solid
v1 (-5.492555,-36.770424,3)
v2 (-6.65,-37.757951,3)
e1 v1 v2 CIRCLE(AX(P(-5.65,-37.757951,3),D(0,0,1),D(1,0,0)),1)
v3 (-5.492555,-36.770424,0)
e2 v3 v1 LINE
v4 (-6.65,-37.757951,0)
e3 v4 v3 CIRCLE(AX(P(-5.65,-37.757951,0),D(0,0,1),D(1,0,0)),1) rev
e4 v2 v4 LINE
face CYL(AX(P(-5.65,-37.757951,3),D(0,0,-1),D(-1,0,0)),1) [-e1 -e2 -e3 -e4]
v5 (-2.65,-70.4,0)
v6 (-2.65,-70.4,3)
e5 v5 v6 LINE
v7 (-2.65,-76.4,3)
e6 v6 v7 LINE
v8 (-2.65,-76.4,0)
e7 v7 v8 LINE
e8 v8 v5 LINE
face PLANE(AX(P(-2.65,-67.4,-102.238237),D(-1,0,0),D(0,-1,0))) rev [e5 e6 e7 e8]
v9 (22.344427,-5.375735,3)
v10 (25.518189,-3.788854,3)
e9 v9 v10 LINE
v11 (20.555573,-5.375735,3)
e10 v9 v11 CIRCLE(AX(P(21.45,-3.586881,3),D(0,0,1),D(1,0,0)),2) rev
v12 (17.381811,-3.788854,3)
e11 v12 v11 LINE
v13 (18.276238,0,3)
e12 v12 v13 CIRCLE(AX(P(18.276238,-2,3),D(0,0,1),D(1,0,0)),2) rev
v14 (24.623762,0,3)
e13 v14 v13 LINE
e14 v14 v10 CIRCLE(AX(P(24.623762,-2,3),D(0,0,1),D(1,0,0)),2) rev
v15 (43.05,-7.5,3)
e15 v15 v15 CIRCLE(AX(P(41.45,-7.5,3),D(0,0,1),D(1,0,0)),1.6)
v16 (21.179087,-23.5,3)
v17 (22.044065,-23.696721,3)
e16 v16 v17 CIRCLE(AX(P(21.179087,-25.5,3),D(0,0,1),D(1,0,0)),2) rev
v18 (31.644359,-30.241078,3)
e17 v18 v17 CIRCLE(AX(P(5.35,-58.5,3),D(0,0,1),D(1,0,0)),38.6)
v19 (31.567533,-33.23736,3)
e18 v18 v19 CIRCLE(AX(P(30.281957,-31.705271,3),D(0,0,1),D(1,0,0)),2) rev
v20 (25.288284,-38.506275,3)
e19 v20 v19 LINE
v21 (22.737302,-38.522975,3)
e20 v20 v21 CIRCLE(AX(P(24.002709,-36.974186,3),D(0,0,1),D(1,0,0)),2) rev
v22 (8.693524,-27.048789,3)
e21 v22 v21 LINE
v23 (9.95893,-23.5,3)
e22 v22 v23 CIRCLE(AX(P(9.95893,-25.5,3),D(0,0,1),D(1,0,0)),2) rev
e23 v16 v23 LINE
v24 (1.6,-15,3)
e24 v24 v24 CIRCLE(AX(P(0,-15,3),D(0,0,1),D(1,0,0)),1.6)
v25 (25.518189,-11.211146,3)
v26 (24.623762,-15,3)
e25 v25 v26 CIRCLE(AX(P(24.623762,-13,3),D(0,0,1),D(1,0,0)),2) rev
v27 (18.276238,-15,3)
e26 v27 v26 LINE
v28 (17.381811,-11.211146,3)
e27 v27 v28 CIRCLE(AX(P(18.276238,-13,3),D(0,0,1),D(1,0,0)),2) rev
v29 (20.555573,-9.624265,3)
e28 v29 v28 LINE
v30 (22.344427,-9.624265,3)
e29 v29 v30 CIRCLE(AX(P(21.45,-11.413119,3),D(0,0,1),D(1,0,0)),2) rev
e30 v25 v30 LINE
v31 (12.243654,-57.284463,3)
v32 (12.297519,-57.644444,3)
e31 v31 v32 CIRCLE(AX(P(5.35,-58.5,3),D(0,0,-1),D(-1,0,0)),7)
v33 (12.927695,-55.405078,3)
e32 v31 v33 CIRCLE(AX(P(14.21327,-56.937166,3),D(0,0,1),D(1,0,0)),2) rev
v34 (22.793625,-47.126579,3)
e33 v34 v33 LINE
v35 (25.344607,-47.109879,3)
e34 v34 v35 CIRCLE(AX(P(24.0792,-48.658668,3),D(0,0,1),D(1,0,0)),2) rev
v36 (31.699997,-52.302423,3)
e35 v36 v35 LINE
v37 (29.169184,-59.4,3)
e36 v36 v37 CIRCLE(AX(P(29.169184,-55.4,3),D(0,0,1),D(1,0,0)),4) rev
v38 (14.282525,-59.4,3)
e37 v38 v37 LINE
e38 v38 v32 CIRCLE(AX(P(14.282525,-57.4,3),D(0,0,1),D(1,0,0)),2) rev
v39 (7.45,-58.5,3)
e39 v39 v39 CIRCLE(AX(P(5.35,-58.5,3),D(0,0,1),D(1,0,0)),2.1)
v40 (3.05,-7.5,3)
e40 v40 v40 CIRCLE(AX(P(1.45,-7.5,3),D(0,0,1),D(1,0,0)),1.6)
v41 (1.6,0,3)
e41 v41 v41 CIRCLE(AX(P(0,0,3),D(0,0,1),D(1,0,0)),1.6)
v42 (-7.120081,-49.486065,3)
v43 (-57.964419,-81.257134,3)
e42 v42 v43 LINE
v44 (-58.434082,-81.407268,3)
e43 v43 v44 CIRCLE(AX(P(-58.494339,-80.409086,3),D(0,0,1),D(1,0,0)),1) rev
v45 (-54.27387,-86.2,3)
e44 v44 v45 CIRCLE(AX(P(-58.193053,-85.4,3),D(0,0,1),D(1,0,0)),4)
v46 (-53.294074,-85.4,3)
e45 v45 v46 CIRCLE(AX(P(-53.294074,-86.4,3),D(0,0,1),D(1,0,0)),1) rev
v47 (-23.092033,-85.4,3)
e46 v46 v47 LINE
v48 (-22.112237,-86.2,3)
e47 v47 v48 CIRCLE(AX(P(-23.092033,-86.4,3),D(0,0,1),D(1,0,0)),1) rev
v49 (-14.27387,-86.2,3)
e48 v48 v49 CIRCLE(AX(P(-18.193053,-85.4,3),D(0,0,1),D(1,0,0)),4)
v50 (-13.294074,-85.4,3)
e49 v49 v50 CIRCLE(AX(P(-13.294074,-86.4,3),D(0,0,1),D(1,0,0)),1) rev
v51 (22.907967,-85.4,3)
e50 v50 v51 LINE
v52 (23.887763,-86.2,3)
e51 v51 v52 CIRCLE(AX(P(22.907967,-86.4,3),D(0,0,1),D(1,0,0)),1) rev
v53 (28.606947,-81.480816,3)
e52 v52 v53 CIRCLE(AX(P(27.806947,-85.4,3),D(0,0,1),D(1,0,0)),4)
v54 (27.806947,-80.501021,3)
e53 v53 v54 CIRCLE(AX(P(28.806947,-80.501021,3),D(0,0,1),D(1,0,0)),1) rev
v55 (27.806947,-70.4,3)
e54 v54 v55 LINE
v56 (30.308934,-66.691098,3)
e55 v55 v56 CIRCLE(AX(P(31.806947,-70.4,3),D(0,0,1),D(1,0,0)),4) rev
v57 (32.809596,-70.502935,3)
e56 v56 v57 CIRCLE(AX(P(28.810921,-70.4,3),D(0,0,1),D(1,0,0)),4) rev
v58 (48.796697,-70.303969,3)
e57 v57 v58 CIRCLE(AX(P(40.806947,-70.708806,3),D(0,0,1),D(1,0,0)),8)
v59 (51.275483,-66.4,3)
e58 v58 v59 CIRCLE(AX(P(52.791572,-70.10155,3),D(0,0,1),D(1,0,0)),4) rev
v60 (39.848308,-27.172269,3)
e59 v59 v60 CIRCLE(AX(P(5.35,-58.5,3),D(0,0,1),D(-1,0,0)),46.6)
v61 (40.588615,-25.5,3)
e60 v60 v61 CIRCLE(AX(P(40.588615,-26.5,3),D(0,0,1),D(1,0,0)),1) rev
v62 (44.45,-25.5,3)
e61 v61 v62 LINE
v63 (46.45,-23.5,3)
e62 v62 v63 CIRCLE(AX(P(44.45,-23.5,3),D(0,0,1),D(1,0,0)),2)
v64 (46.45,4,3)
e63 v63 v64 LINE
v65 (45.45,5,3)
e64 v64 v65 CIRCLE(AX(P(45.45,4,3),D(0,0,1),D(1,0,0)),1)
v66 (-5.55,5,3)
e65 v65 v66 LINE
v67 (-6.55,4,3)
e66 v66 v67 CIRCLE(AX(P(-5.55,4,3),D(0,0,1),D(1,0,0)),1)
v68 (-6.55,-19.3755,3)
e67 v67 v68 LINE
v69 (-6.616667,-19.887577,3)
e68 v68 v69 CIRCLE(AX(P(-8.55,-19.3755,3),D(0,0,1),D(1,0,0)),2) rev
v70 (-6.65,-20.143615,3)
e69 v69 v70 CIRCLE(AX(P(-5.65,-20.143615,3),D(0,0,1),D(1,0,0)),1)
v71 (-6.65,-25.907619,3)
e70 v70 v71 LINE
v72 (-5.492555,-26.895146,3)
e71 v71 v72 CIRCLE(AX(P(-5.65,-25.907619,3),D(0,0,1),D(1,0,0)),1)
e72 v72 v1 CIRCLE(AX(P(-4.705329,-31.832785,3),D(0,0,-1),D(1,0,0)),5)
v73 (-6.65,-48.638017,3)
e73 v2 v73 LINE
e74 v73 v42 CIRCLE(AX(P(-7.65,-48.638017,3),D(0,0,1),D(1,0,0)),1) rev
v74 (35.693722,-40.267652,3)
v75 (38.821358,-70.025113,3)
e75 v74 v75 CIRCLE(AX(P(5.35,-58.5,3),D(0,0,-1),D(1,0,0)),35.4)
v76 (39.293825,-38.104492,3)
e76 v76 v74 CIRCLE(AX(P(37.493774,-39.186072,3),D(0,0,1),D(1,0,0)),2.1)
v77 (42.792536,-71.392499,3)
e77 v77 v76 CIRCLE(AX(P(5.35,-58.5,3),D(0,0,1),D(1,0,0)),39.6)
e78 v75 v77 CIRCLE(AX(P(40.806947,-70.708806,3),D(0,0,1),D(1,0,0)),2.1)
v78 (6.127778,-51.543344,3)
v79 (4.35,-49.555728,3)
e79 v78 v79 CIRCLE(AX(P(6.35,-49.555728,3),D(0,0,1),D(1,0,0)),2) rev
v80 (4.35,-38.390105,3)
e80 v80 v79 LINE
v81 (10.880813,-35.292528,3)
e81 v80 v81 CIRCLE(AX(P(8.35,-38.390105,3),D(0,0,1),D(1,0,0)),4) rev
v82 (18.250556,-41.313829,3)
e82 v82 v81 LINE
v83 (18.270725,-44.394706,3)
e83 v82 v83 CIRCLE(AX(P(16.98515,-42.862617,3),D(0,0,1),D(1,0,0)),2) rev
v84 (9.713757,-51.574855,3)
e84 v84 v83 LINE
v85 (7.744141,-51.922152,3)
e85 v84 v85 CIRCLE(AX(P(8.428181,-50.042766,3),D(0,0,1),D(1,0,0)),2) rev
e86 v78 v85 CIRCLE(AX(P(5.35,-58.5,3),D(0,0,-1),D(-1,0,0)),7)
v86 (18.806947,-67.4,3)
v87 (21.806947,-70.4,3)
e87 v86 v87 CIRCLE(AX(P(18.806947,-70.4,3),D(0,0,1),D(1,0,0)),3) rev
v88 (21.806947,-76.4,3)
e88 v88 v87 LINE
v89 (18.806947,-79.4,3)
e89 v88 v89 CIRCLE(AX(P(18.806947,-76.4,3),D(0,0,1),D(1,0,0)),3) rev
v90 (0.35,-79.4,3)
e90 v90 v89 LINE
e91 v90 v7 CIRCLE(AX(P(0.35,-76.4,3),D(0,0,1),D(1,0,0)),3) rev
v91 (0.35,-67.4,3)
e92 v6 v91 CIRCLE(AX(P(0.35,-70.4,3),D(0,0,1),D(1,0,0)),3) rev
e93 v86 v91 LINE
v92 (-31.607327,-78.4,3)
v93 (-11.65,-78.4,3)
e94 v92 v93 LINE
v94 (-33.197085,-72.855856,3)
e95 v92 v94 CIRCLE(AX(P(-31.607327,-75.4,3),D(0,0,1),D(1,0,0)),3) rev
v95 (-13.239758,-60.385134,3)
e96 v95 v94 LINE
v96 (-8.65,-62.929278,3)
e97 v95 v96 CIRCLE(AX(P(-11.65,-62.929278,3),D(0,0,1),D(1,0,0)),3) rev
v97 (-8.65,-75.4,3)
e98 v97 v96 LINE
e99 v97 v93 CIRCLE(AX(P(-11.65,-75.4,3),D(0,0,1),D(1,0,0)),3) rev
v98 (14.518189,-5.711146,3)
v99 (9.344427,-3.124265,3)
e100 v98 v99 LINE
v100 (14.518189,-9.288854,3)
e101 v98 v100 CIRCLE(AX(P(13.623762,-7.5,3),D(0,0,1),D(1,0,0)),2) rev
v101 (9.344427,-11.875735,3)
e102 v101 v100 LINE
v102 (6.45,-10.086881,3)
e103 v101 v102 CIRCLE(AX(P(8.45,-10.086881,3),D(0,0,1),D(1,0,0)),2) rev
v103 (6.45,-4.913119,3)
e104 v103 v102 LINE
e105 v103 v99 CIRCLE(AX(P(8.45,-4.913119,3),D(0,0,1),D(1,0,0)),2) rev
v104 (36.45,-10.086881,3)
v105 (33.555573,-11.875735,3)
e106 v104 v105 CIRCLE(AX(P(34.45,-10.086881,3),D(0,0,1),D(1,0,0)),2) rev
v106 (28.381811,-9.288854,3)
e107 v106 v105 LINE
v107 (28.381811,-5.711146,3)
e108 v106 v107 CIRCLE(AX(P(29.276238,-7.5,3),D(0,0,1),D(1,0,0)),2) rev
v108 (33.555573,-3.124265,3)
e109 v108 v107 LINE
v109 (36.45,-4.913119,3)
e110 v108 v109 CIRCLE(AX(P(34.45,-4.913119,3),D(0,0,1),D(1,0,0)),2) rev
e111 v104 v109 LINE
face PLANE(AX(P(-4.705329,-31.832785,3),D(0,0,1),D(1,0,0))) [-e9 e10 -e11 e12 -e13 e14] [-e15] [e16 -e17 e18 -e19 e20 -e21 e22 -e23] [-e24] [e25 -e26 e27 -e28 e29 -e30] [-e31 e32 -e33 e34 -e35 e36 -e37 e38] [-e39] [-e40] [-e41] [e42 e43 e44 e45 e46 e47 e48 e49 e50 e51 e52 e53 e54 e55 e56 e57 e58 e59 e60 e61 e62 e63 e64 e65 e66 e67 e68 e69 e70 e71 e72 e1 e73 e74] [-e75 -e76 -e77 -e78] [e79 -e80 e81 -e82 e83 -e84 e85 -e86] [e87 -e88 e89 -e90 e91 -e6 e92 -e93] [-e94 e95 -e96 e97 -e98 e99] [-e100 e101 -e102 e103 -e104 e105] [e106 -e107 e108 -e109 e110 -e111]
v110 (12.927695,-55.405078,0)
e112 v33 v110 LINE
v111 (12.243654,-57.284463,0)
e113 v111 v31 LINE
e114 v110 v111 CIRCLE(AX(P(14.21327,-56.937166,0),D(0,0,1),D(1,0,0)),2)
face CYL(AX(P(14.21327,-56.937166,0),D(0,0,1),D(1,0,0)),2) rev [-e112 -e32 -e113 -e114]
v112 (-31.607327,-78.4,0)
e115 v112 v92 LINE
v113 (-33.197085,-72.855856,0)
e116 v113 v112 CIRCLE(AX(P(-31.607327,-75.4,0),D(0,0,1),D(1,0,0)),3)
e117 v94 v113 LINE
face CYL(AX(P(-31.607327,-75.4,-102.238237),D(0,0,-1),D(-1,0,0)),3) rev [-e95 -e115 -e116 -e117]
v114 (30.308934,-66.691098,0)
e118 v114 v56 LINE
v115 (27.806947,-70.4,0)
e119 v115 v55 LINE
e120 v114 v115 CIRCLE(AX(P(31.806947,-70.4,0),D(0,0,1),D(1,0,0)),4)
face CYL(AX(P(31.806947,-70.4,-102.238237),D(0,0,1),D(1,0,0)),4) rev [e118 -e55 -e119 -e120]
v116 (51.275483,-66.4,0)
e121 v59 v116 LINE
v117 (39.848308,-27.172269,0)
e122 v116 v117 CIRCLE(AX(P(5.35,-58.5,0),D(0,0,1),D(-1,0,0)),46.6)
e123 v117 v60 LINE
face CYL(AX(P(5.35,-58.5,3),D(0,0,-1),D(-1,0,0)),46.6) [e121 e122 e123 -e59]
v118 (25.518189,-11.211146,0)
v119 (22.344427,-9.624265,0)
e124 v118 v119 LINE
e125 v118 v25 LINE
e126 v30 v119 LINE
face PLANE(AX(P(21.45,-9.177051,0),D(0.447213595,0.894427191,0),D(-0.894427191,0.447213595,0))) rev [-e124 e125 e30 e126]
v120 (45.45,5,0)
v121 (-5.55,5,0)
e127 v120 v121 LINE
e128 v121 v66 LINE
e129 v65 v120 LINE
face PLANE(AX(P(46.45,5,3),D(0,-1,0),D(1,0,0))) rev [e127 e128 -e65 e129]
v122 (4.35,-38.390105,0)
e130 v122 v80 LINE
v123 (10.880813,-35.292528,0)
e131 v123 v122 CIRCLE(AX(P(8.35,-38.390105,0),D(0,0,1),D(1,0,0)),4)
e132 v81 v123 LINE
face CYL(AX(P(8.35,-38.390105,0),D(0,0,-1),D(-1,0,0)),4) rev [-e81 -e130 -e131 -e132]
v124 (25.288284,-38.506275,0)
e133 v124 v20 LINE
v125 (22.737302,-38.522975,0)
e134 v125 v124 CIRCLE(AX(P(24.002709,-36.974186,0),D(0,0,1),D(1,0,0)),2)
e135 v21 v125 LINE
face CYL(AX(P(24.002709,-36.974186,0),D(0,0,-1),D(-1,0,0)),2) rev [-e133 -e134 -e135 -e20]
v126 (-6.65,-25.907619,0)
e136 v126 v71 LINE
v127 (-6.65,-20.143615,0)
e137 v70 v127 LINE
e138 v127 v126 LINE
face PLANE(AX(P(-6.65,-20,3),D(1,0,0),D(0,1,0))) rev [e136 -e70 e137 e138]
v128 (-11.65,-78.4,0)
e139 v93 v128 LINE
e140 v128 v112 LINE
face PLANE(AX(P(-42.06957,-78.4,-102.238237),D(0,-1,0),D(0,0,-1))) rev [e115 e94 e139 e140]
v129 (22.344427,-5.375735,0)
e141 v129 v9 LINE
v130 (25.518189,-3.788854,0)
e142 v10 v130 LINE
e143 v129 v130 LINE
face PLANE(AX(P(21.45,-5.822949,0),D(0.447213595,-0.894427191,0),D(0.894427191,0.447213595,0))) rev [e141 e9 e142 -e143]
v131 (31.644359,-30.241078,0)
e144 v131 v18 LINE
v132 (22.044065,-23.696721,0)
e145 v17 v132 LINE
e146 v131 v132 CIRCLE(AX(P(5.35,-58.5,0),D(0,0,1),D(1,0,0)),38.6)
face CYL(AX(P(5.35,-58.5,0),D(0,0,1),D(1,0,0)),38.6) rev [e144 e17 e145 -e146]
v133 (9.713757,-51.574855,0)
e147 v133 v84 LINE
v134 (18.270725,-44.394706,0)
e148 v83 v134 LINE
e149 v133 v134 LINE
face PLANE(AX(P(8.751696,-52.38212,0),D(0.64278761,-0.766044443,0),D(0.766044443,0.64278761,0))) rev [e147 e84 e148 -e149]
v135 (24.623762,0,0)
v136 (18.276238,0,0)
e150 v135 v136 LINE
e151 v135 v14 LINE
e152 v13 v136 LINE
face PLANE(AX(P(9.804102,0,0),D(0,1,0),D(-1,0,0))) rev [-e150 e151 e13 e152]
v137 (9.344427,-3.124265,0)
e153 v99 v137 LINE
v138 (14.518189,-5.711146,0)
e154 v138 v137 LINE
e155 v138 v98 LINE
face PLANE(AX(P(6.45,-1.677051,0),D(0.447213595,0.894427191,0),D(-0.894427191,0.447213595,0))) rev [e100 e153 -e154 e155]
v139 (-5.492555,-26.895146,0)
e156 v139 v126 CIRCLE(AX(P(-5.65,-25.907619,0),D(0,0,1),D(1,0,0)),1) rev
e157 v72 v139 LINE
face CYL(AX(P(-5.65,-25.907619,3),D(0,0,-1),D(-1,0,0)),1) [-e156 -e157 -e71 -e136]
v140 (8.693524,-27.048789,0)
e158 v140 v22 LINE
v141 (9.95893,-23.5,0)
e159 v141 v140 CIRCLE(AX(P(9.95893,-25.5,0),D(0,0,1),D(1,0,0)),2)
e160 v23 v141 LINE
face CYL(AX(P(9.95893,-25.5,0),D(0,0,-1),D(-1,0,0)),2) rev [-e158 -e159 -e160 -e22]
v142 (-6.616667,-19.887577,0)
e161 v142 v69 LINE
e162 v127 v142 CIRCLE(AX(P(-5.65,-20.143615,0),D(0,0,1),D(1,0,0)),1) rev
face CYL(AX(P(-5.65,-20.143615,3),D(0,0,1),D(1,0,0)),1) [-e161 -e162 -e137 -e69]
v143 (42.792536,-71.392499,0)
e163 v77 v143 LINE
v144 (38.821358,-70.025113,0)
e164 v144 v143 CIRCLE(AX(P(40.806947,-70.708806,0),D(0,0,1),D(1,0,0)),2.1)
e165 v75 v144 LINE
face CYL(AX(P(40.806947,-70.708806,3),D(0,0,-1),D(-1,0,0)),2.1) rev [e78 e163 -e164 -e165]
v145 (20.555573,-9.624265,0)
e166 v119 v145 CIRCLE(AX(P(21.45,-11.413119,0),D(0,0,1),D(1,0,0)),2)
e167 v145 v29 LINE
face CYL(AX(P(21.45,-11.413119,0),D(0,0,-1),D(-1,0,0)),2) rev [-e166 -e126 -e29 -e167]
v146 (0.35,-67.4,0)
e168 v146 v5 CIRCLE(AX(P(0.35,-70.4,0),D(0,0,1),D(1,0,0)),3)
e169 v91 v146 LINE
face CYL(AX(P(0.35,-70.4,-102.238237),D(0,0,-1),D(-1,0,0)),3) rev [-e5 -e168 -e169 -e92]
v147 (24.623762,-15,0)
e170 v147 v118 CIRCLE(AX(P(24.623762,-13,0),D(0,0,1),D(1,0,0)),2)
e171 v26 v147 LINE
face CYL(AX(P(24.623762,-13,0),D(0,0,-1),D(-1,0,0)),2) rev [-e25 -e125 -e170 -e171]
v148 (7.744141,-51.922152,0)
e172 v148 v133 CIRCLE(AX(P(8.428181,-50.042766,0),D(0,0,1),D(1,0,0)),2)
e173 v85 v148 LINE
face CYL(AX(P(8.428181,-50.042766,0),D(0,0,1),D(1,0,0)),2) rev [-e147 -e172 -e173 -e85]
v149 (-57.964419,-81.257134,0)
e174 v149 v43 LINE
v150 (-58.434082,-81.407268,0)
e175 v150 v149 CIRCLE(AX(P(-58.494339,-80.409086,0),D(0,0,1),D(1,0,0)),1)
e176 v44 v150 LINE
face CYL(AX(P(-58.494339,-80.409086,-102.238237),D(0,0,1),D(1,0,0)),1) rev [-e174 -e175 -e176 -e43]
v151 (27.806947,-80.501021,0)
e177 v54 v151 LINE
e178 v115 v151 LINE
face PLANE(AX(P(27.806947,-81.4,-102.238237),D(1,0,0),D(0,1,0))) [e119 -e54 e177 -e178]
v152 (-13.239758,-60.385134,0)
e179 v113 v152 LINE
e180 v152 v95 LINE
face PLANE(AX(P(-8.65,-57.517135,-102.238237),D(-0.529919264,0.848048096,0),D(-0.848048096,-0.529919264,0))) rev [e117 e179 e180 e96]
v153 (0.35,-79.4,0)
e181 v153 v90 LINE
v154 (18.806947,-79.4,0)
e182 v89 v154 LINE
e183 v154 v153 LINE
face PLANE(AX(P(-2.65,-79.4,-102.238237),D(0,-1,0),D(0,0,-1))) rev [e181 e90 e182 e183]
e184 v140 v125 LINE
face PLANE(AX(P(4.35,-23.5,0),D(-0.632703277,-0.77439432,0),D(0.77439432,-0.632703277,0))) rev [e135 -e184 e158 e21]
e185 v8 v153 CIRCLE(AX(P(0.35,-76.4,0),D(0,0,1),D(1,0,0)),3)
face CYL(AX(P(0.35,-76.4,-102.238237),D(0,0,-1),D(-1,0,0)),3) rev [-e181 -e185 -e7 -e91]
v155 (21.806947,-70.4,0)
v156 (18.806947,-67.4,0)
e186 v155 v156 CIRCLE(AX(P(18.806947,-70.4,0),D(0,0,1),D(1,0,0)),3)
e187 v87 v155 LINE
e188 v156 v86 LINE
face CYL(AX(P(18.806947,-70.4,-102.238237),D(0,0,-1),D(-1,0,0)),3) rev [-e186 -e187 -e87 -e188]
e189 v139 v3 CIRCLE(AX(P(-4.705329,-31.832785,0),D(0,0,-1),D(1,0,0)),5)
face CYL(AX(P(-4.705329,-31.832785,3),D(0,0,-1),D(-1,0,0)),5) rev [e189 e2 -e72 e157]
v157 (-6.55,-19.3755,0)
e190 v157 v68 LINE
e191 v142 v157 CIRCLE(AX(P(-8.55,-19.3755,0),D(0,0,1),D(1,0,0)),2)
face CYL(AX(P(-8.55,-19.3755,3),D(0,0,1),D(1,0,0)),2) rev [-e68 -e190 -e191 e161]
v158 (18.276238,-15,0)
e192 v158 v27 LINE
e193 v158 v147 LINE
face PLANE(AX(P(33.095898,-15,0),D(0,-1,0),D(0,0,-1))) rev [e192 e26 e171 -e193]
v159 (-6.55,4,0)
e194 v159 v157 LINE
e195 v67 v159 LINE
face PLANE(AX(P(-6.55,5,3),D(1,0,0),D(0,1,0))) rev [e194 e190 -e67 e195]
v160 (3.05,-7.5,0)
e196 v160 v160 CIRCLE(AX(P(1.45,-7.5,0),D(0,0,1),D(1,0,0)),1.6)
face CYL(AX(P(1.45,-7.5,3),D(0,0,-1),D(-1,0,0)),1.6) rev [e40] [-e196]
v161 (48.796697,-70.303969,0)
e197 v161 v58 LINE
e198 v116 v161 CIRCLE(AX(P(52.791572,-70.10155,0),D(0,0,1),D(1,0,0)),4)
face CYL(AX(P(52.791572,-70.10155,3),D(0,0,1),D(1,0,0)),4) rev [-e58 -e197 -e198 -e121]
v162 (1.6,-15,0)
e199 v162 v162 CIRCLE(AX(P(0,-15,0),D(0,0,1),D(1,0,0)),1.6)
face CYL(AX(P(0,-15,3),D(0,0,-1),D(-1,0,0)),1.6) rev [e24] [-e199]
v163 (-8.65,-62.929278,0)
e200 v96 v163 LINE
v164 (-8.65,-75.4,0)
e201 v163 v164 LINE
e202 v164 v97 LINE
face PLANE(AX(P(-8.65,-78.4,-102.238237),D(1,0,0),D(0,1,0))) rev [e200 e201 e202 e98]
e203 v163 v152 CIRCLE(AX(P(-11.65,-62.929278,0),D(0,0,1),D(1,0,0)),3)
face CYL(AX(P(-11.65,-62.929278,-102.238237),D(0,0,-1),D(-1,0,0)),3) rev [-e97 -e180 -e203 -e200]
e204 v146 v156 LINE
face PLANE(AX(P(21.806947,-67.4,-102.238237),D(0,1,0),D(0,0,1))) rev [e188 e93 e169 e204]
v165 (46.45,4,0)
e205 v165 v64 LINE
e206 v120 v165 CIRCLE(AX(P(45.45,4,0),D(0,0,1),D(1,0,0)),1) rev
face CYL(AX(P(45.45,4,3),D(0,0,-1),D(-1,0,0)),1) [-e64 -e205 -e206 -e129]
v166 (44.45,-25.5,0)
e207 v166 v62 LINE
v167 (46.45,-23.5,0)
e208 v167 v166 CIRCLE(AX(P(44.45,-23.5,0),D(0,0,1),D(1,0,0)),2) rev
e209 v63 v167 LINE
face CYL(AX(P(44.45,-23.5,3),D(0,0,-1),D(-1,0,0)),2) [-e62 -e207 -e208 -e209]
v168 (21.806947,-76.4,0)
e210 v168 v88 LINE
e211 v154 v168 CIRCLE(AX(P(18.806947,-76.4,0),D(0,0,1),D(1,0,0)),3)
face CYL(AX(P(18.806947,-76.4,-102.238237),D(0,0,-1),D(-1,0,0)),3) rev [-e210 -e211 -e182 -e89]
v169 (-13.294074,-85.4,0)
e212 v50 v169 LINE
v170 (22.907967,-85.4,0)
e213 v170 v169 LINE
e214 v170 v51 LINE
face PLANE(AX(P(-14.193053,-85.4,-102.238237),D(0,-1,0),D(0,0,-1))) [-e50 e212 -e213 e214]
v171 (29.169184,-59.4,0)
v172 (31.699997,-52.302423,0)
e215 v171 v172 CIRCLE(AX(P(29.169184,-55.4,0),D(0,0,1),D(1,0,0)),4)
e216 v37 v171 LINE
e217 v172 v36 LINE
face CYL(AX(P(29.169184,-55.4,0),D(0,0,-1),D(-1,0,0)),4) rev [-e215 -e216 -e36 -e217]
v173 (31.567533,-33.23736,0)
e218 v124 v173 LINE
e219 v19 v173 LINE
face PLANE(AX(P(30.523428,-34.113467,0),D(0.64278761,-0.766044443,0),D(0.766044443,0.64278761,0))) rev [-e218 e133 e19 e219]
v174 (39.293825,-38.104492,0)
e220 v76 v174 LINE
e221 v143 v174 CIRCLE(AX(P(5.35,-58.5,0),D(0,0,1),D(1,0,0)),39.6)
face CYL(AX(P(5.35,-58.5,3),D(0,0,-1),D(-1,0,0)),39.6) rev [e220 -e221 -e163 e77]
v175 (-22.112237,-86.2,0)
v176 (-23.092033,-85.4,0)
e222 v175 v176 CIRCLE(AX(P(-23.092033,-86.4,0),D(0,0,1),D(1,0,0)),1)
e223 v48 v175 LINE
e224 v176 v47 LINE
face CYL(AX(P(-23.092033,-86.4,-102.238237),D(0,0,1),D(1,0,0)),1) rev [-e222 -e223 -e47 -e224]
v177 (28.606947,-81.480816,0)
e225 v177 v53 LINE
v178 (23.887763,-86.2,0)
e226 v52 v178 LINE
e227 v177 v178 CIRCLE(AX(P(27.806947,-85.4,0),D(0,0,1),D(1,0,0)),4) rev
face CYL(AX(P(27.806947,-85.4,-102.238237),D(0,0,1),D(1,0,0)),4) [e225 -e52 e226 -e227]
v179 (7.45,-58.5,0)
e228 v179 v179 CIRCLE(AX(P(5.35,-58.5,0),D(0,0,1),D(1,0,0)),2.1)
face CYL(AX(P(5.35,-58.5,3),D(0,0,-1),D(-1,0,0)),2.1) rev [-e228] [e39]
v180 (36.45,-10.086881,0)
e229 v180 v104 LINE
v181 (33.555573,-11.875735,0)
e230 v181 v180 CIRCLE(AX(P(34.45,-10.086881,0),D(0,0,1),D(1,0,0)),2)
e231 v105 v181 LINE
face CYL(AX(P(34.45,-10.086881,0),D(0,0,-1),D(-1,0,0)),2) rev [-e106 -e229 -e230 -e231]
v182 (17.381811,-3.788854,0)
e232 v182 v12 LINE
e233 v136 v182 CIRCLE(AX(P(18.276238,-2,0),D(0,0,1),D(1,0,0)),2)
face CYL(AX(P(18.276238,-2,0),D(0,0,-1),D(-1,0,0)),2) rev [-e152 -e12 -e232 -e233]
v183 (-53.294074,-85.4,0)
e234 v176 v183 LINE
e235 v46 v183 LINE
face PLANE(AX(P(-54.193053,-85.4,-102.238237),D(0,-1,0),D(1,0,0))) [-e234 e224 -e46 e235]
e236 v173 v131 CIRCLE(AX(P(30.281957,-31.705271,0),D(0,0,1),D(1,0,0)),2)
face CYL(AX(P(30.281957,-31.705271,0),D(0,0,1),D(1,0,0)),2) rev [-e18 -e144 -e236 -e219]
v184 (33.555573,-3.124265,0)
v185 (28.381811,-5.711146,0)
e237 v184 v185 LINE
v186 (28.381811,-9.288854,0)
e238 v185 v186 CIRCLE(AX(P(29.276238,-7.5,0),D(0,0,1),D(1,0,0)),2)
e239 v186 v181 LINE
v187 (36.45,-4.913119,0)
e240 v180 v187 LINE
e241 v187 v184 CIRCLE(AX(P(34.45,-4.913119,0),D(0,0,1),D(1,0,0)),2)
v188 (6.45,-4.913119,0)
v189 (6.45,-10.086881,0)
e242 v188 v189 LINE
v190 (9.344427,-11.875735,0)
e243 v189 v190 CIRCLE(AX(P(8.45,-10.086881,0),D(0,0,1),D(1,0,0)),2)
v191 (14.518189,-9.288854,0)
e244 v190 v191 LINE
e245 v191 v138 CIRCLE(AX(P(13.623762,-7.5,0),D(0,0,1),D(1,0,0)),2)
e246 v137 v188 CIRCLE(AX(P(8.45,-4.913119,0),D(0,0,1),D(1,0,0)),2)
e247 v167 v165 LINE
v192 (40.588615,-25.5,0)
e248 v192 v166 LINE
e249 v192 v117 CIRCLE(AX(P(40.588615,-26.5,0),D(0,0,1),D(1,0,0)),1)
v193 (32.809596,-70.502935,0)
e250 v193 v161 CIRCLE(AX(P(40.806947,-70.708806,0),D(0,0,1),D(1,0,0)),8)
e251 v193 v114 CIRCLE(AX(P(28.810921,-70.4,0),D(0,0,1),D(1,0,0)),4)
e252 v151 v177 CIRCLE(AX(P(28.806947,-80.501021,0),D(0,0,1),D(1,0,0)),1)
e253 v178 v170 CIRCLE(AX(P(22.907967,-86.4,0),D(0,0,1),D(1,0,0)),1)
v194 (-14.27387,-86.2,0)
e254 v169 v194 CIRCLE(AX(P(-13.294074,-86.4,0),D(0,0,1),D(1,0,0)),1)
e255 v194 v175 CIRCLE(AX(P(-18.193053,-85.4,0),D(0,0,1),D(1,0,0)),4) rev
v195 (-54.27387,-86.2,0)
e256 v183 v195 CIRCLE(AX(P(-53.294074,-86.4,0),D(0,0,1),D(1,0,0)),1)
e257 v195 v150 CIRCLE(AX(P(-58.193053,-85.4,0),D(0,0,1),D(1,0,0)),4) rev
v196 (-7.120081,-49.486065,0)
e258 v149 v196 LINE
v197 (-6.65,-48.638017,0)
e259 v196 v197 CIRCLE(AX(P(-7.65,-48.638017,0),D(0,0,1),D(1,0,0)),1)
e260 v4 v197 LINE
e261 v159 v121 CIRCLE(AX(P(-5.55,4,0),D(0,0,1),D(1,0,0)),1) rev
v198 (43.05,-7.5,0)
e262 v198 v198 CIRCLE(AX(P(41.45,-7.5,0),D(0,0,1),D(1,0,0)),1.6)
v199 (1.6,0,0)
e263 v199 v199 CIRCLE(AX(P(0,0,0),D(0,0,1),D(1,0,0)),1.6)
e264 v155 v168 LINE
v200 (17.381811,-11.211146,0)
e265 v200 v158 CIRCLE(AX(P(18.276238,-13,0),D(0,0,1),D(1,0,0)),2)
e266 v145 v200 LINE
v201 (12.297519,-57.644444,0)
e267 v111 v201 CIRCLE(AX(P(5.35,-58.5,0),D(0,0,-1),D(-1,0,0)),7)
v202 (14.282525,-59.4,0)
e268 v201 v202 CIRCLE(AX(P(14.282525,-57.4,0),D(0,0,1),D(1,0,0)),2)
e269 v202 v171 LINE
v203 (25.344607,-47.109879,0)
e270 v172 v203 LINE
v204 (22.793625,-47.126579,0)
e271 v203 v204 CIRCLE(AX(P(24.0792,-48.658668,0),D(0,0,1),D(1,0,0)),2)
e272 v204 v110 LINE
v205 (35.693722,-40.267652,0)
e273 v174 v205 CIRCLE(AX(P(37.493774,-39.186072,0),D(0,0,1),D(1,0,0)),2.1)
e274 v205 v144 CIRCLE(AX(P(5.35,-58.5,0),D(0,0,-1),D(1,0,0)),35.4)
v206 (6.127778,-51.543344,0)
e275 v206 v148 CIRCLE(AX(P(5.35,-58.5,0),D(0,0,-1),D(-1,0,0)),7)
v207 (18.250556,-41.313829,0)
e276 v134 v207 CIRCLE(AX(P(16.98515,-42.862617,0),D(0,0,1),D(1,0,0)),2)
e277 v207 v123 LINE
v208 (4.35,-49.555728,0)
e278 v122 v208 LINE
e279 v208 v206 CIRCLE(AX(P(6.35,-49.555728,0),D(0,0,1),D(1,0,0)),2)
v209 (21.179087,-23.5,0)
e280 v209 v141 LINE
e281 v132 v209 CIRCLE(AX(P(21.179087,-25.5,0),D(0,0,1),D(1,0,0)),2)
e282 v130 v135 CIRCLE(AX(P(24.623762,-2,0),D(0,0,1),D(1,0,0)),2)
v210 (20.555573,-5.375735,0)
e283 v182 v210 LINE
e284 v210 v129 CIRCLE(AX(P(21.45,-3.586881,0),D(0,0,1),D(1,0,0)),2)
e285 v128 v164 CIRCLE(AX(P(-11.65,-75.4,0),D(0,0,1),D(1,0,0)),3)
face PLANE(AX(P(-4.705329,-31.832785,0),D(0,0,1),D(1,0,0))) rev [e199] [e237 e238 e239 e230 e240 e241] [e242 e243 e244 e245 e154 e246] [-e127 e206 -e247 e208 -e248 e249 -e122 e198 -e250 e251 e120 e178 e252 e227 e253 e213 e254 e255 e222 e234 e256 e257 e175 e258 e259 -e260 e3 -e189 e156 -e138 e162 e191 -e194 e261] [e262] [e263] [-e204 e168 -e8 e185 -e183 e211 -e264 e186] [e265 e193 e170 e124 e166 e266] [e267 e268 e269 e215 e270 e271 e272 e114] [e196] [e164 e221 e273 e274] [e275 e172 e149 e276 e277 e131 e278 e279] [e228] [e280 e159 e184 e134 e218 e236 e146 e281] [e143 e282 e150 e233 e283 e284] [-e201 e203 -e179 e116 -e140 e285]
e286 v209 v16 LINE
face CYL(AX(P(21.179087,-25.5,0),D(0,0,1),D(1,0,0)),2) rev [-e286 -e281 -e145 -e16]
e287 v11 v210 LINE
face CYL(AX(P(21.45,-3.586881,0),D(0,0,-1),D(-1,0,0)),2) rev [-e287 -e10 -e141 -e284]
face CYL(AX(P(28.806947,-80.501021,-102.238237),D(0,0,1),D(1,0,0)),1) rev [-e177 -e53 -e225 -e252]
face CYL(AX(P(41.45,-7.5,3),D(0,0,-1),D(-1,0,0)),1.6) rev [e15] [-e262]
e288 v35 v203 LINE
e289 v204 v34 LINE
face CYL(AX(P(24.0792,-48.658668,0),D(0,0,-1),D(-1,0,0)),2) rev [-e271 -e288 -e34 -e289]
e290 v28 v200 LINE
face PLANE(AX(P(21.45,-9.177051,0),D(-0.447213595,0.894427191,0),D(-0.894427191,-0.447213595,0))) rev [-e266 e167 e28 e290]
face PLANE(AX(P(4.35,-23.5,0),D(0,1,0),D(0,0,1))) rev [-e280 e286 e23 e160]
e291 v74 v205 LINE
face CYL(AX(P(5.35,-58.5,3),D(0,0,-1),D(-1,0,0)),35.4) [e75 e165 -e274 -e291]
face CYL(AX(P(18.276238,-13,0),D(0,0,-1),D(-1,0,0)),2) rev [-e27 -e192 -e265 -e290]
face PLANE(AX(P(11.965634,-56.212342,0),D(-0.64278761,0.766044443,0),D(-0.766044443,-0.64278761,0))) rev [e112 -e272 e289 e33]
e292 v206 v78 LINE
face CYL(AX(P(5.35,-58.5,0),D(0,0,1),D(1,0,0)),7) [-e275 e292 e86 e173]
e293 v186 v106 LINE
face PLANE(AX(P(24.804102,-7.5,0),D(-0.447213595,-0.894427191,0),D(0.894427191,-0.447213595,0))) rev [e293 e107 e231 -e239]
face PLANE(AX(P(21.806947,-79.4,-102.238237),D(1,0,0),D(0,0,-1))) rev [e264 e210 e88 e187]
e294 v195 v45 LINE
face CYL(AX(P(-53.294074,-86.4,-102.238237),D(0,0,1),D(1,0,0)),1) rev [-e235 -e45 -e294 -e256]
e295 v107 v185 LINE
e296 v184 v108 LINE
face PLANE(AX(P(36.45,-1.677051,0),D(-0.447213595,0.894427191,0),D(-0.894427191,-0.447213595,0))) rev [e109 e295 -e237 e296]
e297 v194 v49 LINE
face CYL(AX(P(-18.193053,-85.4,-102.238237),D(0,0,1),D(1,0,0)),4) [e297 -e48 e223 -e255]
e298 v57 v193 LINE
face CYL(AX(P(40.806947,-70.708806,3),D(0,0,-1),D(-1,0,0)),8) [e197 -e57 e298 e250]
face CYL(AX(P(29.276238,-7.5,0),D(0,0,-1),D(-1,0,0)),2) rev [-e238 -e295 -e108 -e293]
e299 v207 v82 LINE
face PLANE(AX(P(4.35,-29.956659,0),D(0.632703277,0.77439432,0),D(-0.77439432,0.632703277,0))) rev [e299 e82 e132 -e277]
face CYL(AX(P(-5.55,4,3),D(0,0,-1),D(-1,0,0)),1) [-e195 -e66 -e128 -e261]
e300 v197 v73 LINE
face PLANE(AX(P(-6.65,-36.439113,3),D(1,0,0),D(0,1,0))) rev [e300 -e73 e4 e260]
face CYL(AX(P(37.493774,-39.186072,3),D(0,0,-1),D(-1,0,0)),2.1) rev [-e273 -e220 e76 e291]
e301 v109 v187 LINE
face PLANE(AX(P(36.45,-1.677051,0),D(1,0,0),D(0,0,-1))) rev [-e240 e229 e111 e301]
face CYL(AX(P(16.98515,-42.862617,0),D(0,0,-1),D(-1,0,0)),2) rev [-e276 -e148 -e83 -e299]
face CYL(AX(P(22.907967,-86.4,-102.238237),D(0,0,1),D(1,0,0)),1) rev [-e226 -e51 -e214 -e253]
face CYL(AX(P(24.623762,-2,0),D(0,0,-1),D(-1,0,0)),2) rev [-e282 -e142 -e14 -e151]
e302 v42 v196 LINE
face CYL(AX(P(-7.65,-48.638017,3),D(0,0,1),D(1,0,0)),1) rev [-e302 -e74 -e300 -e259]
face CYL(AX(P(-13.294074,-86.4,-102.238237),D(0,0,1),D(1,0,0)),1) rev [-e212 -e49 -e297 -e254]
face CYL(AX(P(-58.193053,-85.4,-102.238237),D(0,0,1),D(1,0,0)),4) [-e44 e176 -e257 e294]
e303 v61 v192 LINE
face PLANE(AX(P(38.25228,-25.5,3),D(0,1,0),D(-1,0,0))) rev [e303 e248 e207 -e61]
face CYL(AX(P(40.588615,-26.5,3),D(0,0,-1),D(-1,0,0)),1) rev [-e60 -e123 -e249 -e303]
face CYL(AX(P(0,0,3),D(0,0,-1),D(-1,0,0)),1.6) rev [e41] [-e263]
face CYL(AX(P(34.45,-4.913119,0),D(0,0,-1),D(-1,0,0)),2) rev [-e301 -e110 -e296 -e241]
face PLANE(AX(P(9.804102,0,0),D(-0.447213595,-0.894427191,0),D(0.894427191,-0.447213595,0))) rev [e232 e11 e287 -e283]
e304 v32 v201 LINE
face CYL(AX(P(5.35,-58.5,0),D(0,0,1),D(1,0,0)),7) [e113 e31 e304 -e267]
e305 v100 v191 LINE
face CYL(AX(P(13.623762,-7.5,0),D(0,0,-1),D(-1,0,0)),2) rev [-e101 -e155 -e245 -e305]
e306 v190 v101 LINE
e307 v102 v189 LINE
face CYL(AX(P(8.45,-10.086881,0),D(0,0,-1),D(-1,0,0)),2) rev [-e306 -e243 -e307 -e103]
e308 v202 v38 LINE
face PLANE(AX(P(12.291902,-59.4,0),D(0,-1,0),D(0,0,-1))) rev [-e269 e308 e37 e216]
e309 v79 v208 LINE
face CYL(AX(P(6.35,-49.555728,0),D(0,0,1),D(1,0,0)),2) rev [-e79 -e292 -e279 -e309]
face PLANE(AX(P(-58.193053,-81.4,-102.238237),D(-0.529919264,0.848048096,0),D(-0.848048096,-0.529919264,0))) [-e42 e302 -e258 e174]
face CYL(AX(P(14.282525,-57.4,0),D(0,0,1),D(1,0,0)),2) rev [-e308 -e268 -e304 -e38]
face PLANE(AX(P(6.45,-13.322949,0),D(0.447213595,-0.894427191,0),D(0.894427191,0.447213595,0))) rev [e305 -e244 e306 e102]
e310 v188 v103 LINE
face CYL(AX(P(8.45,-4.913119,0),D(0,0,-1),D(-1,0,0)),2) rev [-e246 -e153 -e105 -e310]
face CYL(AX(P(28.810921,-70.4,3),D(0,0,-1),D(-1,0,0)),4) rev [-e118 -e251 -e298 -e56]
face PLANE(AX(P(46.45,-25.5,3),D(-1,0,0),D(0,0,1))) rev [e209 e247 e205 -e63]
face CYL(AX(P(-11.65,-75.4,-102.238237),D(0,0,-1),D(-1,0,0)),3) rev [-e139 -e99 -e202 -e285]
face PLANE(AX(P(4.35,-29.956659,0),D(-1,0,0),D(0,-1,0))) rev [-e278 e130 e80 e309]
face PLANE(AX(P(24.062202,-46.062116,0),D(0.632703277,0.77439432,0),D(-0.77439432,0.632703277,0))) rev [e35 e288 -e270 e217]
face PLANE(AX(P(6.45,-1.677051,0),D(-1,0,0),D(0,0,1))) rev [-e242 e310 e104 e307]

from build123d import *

# Parameters (mm, degrees)
SKETCH_1_R          = 1.6
SKETCH_1_R_2        = 2.1
EXTRUDE_1_DEPTH     = 3
CUT_EXTRUDE_1_DEPTH = 3
FILLET_1_R          = 2
FILLET_3_R          = 1
FILLET_4_R          = 4
SKETCH_3_W          = 24.456946585
SKETCH_3_H          = 12
EXTRUDE_2_DEPTH     = 3
FILLET_7_R          = 3
FILLET_8_R          = 1
FILLET_9_R          = 4


with BuildPart() as part:
    # 草图1 → 凸台-拉伸1 (new body)
    with BuildSketch(Plane.XY):
        with BuildLine():
            Line((-6.55, 5), (-6.55, -20))
            Line((-6.55, -20), (-6.65, -20))
            Line((-6.65, -20), (-6.65, -27.226457264))
            ThreePointArc((-6.65, -27.226457264), (0.294670949, -31.832784966), (-6.65, -36.439112668))
            Line((-6.65, -36.439112668), (-6.65, -66.4))
            Line((-6.65, -66.4), (27.321635963, -66.4))
            Line((27.321635963, -66.4), (34.066457534, -66.4))
            ThreePointArc((34.066457534, -66.4), (40.806946585, -78.708805792), (47.547435636, -66.4))
            Line((47.547435636, -66.4), (51.275483122, -66.4))
            ThreePointArc((51.275483122, -66.4), (49.753339314, -44.361278071), (38.252279556, -25.5))
            Line((38.252279556, -25.5), (46.45, -25.5))
            Line((46.45, -25.5), (46.45, 5))
            Line((46.45, 5), (-6.55, 5))
        make_face()
        Circle(SKETCH_1_R, mode=Mode.SUBTRACT)
        with Locations((0, -15)):
            Circle(SKETCH_1_R, mode=Mode.SUBTRACT)
        with Locations((41.45, -7.5)):
            Circle(SKETCH_1_R, mode=Mode.SUBTRACT)
        with Locations((1.45, -7.5)):
            Circle(SKETCH_1_R, mode=Mode.SUBTRACT)
        with Locations((5.35, -58.5)):
            Circle(SKETCH_1_R_2, mode=Mode.SUBTRACT)
        with BuildLine():
            ThreePointArc((39.293825108, -38.104492234), (36.412193819, -37.386020859), (35.693722445, -40.267652148))
            ThreePointArc((35.693722445, -40.267652148), (40.556075096, -54.7996924), (38.821357576, -70.025112668))
            ThreePointArc((38.821357576, -70.025112668), (40.123253461, -72.694394801), (42.792535594, -71.392498917))
            ThreePointArc((42.792535594, -71.392498917), (44.733067057, -54.360672855), (39.293825108, -38.104492234))
        make_face(mode=Mode.SUBTRACT)
    extrude(amount=EXTRUDE_1_DEPTH)

    # 草图2 → 切除-拉伸1 (cut)
    with BuildSketch(Plane.XY.offset(3)):
        with BuildLine():
            Line((8.751696447, -52.382119543), (20.12106304, -42.842088228))
            Line((20.12106304, -42.842088228), (4.35, -29.956658925))
            Line((4.35, -29.956658925), (4.35, -51.57179677))
            ThreePointArc((4.35, -51.57179677), (6.617356384, -51.615683927), (8.751696447, -52.382119543))
        make_face()
        with BuildLine():
            Line((11.965634495, -56.212341759), (24.062202011, -46.062116418))
            Line((24.062202011, -46.062116418), (40.387044425, -59.4))
            Line((40.387044425, -59.4), (12.291901757, -59.4))
            ThreePointArc((12.291901757, -59.4), (12.313618928, -57.787250794), (11.965634495, -56.212341759))
        make_face()
        with BuildLine():
            Line((4.35, -23.5), (24.01970683, -39.570737661))
            Line((24.01970683, -39.570737661), (30.523428477, -34.113467226))
            Line((30.523428477, -34.113467226), (33.250263459, -31.825380998))
            ThreePointArc((33.250263459, -31.825380998), (27.82773831, -27.119890369), (21.62759196, -23.5))
            Line((21.62759196, -23.5), (4.35, -23.5))
        make_face()
        Polygon((6.45, -13.322949017), (18.095898034, -7.5), (6.45, -1.677050983), align=None)
        Polygon((36.45, -1.677050983), (24.804101966, -7.5), (36.45, -13.322949017), align=None)
        Polygon((9.804101966, 0), (21.45, -5.822949017), (33.095898034, 0), align=None)
        Polygon((33.095898034, -15), (9.804101966, -15), (21.45, -9.177050983), align=None)
    extrude(amount=-CUT_EXTRUDE_1_DEPTH, mode=Mode.SUBTRACT)

    # 圆角1
    # the kernel refuses this fillet: 2 mm, written as the material it adds along each edge
    with BuildSketch(Plane(origin=(33.095898034, -15, 3), x_dir=(-0.8944271909999163, 0.4472135954999571, 0), z_dir=(0, 0, -1)), Plane(origin=(9.804101966, 0, 3), x_dir=(0.8944271909999155, -0.44721359549995865, 0), z_dir=(0, 0, -1))) as fillet_1_piece_1:
        with BuildLine():
            CenterArc((FILLET_1_R * 4.2360679775, -FILLET_1_R), FILLET_1_R, 90, 153.434948823)
            Line((FILLET_1_R * 3.788854382, -FILLET_1_R * 1.894427191), (0, 0))
            Line((0, 0), (FILLET_1_R * 4.2360679775, 0))
        make_face()
    extrude(amount=3)
    with BuildSketch(Plane(origin=(21.45, -9.177050983, 3), x_dir=(0.8944271909999166, -0.44721359549995654, 0), z_dir=(0, 0, -1)), Plane(origin=(21.45, -5.822949017, 3), x_dir=(-0.8944271909999162, 0.4472135954999572, 0), z_dir=(0, 0, -1))) as fillet_1_piece_2:
        with BuildLine():
            CenterArc((FILLET_1_R * 0.5, FILLET_1_R), FILLET_1_R, 216.869897646, 53.130102354)
            Line((-FILLET_1_R * 0.3, FILLET_1_R * 0.4), (0, 0))
            Line((0, 0), (FILLET_1_R * 0.5, 0))
        make_face()
    extrude(amount=3)
    with BuildSketch(Plane(origin=(36.45, -1.677050983, 3), x_dir=(-0.8944271909999159, -0.4472135954999579, 0), z_dir=(0, 0, -1)), Plane(origin=(6.45, -13.322949017, 3), x_dir=(0.8944271909999159, 0.4472135954999579, 0), z_dir=(0, 0, -1))) as fillet_1_piece_3:
        with BuildLine():
            CenterArc((FILLET_1_R * 1.61803398875, -FILLET_1_R), FILLET_1_R, 90, 116.565051177)
            Line((FILLET_1_R * 0.72360679775, -FILLET_1_R * 1.4472135955), (0, 0))
            Line((0, 0), (FILLET_1_R * 1.61803398875, 0))
        make_face()
    extrude(amount=3)
    with BuildSketch(Plane(origin=(24.804101966, -7.5, 3), x_dir=(0.8944271909999156, 0.44721359549995826, 0), z_dir=(0, 0, -1)), Plane(origin=(18.095898034, -7.5, 3), x_dir=(-0.8944271909999161, -0.4472135954999576, 0), z_dir=(0, 0, -1))) as fillet_1_piece_4:
        with BuildLine():
            CenterArc((FILLET_1_R * 2, FILLET_1_R), FILLET_1_R, 143.130102354, 126.869897646)
            Line((FILLET_1_R * 1.2, FILLET_1_R * 1.6), (0, 0))
            Line((0, 0), (FILLET_1_R * 2, 0))
        make_face()
    extrude(amount=3)
    with BuildSketch(Plane(origin=(36.45, -13.322949017, 3), x_dir=(-0.8944271909999161, 0.4472135954999575, 0), z_dir=(0, 0, -1)), Plane(origin=(6.45, -1.677050983, 3), x_dir=(0.8944271909999161, -0.4472135954999575, 0), z_dir=(0, 0, -1))) as fillet_1_piece_5:
        with BuildLine():
            CenterArc((FILLET_1_R * 1.61803398875, FILLET_1_R), FILLET_1_R, 153.434948823, 116.565051177)
            Line((FILLET_1_R * 0.72360679775, FILLET_1_R * 1.4472135955), (0, 0))
            Line((0, 0), (FILLET_1_R * 1.61803398875, 0))
        make_face()
    extrude(amount=3)
    with BuildSketch(Plane(origin=(33.095898034, 0, 3), x_dir=(-0.8944271909999161, -0.4472135954999576, 0), z_dir=(0, 0, -1)), Plane(origin=(9.804101966, -15, 3), x_dir=(0.8944271909999159, 0.44721359549995765, 0), z_dir=(0, 0, -1))) as fillet_1_piece_6:
        with BuildLine():
            CenterArc((FILLET_1_R * 4.2360679775, FILLET_1_R), FILLET_1_R, 116.565051177, 153.434948823)
            Line((FILLET_1_R * 3.788854382, FILLET_1_R * 1.894427191), (0, 0))
            Line((0, 0), (FILLET_1_R * 4.2360679775, 0))
        make_face()
    extrude(amount=3)
    with BuildSketch(Plane(origin=(12.291901757, -59.4, 3), x_dir=(0.0031998610068025087, 0.9999948804316636, 0), z_dir=(0, 0, -1))) as fillet_1_piece_7:
        with BuildLine():
            CenterArc((2.006359478, 1.984213169), FILLET_1_R, 179.816661156, 82.979629251)
            Line((0.006369717, 1.990612891), (0, 0))
            ThreePointArc((0, 0), (0.877782272, 0.055253908), (1.755564543, 0))
        make_face()
    extrude(amount=3)
    with BuildSketch(Plane(origin=(24.062202011, -46.062116418, 3), x_dir=(0.7743943203164566, -0.6327032769486919, 0), z_dir=(0, 0, -1)), Plane(origin=(24.01970683, -39.570737661, 3), x_dir=(-0.7743943203164579, 0.6327032769486903, 0), z_dir=(0, 0, -1))) as fillet_1_piece_8:
        with BuildLine():
            CenterArc((FILLET_1_R * 0.828004927499, FILLET_1_R), FILLET_1_R, 190.750151795, 79.249848205)
            Line((-FILLET_1_R * 0.154444976062, FILLET_1_R * 0.813473361169), (0, 0))
            Line((0, 0), (FILLET_1_R * 0.828004927499, 0))
        make_face()
    extrude(amount=3)
    with BuildSketch(Plane(origin=(11.965634495, -56.212341759, 3), x_dir=(0.2510150170560356, -0.9679831926290653, 0), z_dir=(0, 0, -1))) as fillet_1_piece_9:
        with BuildLine():
            CenterArc((1.26580828, -1.993731306), FILLET_1_R, 94.537583786, 60)
            Line((-0.539926697, -1.133893419), (0, 0))
            ThreePointArc((0, 0), (0.553791123, -0.021940428), (1.107582245, 0))
        make_face()
    extrude(amount=3)
    with BuildSketch(Plane(origin=(8.751696447, -52.382119543, 3), x_dir=(0.7660444431189812, 0.6427876096865356, 0), z_dir=(0, 0, -1))) as fillet_1_piece_10:
        with BuildLine():
            CenterArc((1.255880219, -2), FILLET_1_R, 90, 60)
            ThreePointArc((-0.476170589, -1), (-0.218275995, -0.509432606), (0, 0))
            Line((0, 0), (1.255880219, 0))
        make_face()
    extrude(amount=3)
    with BuildSketch(Plane(origin=(20.12106304, -42.842088228, 3), x_dir=(-0.7660444431189825, -0.6427876096865339, 0), z_dir=(0, 0, -1))) as fillet_1_piece_11:
        with BuildLine():
            CenterArc((FILLET_1_R * 1.20772228134, FILLET_1_R), FILLET_1_R, 169.249848205, 100.750151795)
            Line((FILLET_1_R * 0.225272377779, FILLET_1_R * 1.18652663883), (0, 0))
            Line((0, 0), (FILLET_1_R * 1.20772228134, 0))
        make_face()
    extrude(amount=3)
    with BuildSketch(Plane(origin=(4.35, -51.57179677, 3), x_dir=(0, 1, 0), z_dir=(0, 0, -1))) as fillet_1_piece_12:
        with BuildLine():
            CenterArc((2.01606868, 2), FILLET_1_R, 186.379370208, 83.620629792)
            ThreePointArc((0.0284527, 1.777777778), (0.070900422, 0.887981841), (0, 0))
            Line((0, 0), (2.01606868, 0))
        make_face()
    extrude(amount=3)
    with BuildSketch(Plane(origin=(-6.55, -20, 0), x_dir=(0, 1, 0), z_dir=(0, 0, 1))) as fillet_1_piece_13:
        with BuildLine():
            CenterArc((0.6244998, 2), FILLET_1_R, 251.805127661, 18.194872339)
            Line((0, 0.1), (0, 0))
            Line((0, 0), (0.6244998, 0))
        make_face()
    extrude(amount=3)
    with BuildSketch(Plane(origin=(33.250263459, -31.825380998, 3), x_dir=(-0.7660444431189841, -0.642787609686532, 0), z_dir=(0, 0, -1))) as fillet_1_piece_14:
        with BuildLine():
            CenterArc((2.196649177, 2), FILLET_1_R, 172.937566446, 97.062433554)
            ThreePointArc((0.211823647, 2.245901639), (0.089501392, 1.12449858), (0, 0))
            Line((0, 0), (2.196649177, 0))
        make_face()
    extrude(amount=3)
    with BuildSketch(Plane(origin=(21.62759196, -23.5, 3), x_dir=(-1, 0, 0), z_dir=(0, 0, -1))) as fillet_1_piece_15:
        with BuildLine():
            CenterArc((0.44850481, -2), FILLET_1_R, 90, 25.625604553)
            ThreePointArc((-0.41647263, -0.196721311), (-0.208529741, -0.097739453), (0, 0))
            Line((0, 0), (0.44850481, 0))
        make_face()
    extrude(amount=3)
    with BuildSketch(Plane(origin=(4.35, -23.5, 3), x_dir=(1, 0, 0), z_dir=(0, 0, -1))) as fillet_1_piece_16:
        with BuildLine():
            CenterArc((FILLET_1_R * 2.80446519714, FILLET_1_R), FILLET_1_R, 129.249848205, 140.750151795)
            Line((FILLET_1_R * 2.17176192019, FILLET_1_R * 1.77439432032), (0, 0))
            Line((0, 0), (FILLET_1_R * 2.80446519714, 0))
        make_face()
    extrude(amount=3)
    # the kernel refuses this fillet: 2 mm, written as the material it takes off along each edge
    with BuildSketch(Plane(origin=(46.45, -25.5, -5), x_dir=(0, 1, 0), z_dir=(0, 0, 1))) as fillet_1_2_piece_1:
        with BuildLine():
            CenterArc((FILLET_1_R, FILLET_1_R), FILLET_1_R, 180, 90)
            Line((0, FILLET_1_R), (0, 0))
            Line((0, 0), (FILLET_1_R, 0))
        make_face()
    extrude(amount=13, mode=Mode.SUBTRACT)

    # 圆角3
    fillet_3_edges = [part.edges().sort_by_distance(p)[0] for p in [
        (46.45, 5, 1.5),
        (38.252279556, -25.5, 1.5),
        (-6.65, -36.439112668, 1.5),
        (-6.65, -27.226457264, 1.5),
        (-6.65, -20, 1.5),
        (-6.55, 5, 1.5),
    ]]
    fillet(fillet_3_edges, radius=FILLET_3_R)

    # 圆角4
    fillet_4_edges = [part.edges().sort_by_distance(p)[0] for p in [
        (4.35, -29.956658925, 1.5),
        (40.387044425, -59.4, 1.5),
    ]]
    fillet(fillet_4_edges, radius=FILLET_4_R)

    # 草图3 → 凸台-拉伸2 (add)
    with BuildSketch(Plane.XY.offset(3)):
        with BuildLine():
            Line((27.806946585, -81.4), (27.806946585, -66.4))
            Line((27.806946585, -66.4), (-6.65, -66.4))
            Line((-6.65, -66.4), (-6.65, -49.192325617))
            Line((-6.65, -49.192325617), (-58.193053415, -81.4))
            ThreePointArc((-58.193053415, -81.4), (-61.02148054, -88.228427125), (-54.193053415, -85.4))
            Line((-54.193053415, -85.4), (-22.193053415, -85.4))
            ThreePointArc((-22.193053415, -85.4), (-18.193053415, -89.4), (-14.193053415, -85.4))
            Line((-14.193053415, -85.4), (23.806946585, -85.4))
            ThreePointArc((23.806946585, -85.4), (30.63537371, -88.228427125), (27.806946585, -81.4))
        make_face()
        Polygon((-8.65, -57.517134741), (-42.069570339, -78.4), (-8.65, -78.4), align=None, mode=Mode.SUBTRACT)
        with Locations((9.578473293, -73.4)):
            Rectangle(SKETCH_3_W, SKETCH_3_H, mode=Mode.SUBTRACT)
    extrude(amount=-EXTRUDE_2_DEPTH)

    # 圆角7
    fillet_7_edges = [part.edges().sort_by_distance(p)[0] for p in [
        (-8.65, -57.517134741, 1.5),
        (-42.069570339, -78.4, 1.5),
        (-8.65, -78.4, 1.5),
        (-2.65, -67.4, 1.5),
        (-2.65, -79.4, 1.5),
        (21.806946585, -79.4, 1.5),
        (21.806946585, -67.4, 1.5),
    ]]
    fillet(fillet_7_edges, radius=FILLET_7_R)

    # 圆角8
    fillet_8_edges = [part.edges().sort_by_distance(p)[0] for p in [
        (-6.65, -49.192325617, 1.5),
        (-58.193053415, -81.4, 1.5),
        (-54.193053415, -85.4, 1.5),
        (-22.193053415, -85.4, 1.5),
        (-14.193053415, -85.4, 1.5),
        (23.806946585, -85.4, 1.5),
        (27.806946585, -81.4, 1.5),
    ]]
    fillet(fillet_8_edges, radius=FILLET_8_R)

    # 圆角9
    # the kernel refuses this fillet: 4 mm, written as the material it adds along each edge
    with BuildSketch(Plane(origin=(27.806946585, -66.4, 3), x_dir=(0, -1, 0), z_dir=(0, 0, -1))) as fillet_9_piece_1:
        with BuildLine():
            CenterArc((FILLET_9_R, -FILLET_9_R), FILLET_9_R, 90, 90)
            Line((0, -FILLET_9_R), (-FILLET_9_R * 0.02, -FILLET_9_R))
            Line((-FILLET_9_R * 0.02, -FILLET_9_R), (-FILLET_9_R * 0.02, FILLET_9_R * 0.02))
            Line((-FILLET_9_R * 0.02, FILLET_9_R * 0.02), (FILLET_9_R, FILLET_9_R * 0.02))
            Line((FILLET_9_R, FILLET_9_R * 0.02), (FILLET_9_R, 0))
        make_face()
    extrude(amount=3)
    with BuildSketch(Plane(origin=(34.066457534, -66.4, 0), x_dir=(-1, 0, 0), z_dir=(0, 0, 1))) as fillet_9_piece_2:
        with BuildLine():
            CenterArc((5.255536915, 4), FILLET_9_R, 178.525398167, 91.474601833)
            Line((1.256861593, 4.102935264), (1.176888087, 4.104993969))
            ThreePointArc((1.176888087, 4.104993969), (0.832169672, 1.989055834), (-0.067404891, 0.043088058))
            Line((-0.067404891, 0.043088058), (0, -0.08))
            Line((0, -0.08), (5.255536915, -0.08))
            Line((5.255536915, -0.08), (5.255536915, 0))
        make_face()
    extrude(amount=3)
    with BuildSketch(Plane(origin=(47.547435636, -66.4, 0), x_dir=(0.304773744568149, -0.9524247816084527, 0), z_dir=(0, 0, 1))) as fillet_9_piece_3:
        with BuildLine():
            CenterArc((5.123723318, 3.866509844), FILLET_9_R, 184.528573932, 70.627543649)
            Line((1.136210992, 3.550684813), (1.056460746, 3.544368312))
            ThreePointArc((1.056460746, 3.544368312), (0.491911514, 1.799724306), (-0.076193983, 0.0243819))
            Line((-0.076193983, 0.0243819), (0.020494893, -0.077330197))
            ThreePointArc((0.020494893, -0.077330197), (2.049489327, 0.186980312), (4.078483761, -0.077330197))
            Line((4.078483761, -0.077330197), (4.098978655, 0))
        make_face()
    extrude(amount=3)


solid = part.part
